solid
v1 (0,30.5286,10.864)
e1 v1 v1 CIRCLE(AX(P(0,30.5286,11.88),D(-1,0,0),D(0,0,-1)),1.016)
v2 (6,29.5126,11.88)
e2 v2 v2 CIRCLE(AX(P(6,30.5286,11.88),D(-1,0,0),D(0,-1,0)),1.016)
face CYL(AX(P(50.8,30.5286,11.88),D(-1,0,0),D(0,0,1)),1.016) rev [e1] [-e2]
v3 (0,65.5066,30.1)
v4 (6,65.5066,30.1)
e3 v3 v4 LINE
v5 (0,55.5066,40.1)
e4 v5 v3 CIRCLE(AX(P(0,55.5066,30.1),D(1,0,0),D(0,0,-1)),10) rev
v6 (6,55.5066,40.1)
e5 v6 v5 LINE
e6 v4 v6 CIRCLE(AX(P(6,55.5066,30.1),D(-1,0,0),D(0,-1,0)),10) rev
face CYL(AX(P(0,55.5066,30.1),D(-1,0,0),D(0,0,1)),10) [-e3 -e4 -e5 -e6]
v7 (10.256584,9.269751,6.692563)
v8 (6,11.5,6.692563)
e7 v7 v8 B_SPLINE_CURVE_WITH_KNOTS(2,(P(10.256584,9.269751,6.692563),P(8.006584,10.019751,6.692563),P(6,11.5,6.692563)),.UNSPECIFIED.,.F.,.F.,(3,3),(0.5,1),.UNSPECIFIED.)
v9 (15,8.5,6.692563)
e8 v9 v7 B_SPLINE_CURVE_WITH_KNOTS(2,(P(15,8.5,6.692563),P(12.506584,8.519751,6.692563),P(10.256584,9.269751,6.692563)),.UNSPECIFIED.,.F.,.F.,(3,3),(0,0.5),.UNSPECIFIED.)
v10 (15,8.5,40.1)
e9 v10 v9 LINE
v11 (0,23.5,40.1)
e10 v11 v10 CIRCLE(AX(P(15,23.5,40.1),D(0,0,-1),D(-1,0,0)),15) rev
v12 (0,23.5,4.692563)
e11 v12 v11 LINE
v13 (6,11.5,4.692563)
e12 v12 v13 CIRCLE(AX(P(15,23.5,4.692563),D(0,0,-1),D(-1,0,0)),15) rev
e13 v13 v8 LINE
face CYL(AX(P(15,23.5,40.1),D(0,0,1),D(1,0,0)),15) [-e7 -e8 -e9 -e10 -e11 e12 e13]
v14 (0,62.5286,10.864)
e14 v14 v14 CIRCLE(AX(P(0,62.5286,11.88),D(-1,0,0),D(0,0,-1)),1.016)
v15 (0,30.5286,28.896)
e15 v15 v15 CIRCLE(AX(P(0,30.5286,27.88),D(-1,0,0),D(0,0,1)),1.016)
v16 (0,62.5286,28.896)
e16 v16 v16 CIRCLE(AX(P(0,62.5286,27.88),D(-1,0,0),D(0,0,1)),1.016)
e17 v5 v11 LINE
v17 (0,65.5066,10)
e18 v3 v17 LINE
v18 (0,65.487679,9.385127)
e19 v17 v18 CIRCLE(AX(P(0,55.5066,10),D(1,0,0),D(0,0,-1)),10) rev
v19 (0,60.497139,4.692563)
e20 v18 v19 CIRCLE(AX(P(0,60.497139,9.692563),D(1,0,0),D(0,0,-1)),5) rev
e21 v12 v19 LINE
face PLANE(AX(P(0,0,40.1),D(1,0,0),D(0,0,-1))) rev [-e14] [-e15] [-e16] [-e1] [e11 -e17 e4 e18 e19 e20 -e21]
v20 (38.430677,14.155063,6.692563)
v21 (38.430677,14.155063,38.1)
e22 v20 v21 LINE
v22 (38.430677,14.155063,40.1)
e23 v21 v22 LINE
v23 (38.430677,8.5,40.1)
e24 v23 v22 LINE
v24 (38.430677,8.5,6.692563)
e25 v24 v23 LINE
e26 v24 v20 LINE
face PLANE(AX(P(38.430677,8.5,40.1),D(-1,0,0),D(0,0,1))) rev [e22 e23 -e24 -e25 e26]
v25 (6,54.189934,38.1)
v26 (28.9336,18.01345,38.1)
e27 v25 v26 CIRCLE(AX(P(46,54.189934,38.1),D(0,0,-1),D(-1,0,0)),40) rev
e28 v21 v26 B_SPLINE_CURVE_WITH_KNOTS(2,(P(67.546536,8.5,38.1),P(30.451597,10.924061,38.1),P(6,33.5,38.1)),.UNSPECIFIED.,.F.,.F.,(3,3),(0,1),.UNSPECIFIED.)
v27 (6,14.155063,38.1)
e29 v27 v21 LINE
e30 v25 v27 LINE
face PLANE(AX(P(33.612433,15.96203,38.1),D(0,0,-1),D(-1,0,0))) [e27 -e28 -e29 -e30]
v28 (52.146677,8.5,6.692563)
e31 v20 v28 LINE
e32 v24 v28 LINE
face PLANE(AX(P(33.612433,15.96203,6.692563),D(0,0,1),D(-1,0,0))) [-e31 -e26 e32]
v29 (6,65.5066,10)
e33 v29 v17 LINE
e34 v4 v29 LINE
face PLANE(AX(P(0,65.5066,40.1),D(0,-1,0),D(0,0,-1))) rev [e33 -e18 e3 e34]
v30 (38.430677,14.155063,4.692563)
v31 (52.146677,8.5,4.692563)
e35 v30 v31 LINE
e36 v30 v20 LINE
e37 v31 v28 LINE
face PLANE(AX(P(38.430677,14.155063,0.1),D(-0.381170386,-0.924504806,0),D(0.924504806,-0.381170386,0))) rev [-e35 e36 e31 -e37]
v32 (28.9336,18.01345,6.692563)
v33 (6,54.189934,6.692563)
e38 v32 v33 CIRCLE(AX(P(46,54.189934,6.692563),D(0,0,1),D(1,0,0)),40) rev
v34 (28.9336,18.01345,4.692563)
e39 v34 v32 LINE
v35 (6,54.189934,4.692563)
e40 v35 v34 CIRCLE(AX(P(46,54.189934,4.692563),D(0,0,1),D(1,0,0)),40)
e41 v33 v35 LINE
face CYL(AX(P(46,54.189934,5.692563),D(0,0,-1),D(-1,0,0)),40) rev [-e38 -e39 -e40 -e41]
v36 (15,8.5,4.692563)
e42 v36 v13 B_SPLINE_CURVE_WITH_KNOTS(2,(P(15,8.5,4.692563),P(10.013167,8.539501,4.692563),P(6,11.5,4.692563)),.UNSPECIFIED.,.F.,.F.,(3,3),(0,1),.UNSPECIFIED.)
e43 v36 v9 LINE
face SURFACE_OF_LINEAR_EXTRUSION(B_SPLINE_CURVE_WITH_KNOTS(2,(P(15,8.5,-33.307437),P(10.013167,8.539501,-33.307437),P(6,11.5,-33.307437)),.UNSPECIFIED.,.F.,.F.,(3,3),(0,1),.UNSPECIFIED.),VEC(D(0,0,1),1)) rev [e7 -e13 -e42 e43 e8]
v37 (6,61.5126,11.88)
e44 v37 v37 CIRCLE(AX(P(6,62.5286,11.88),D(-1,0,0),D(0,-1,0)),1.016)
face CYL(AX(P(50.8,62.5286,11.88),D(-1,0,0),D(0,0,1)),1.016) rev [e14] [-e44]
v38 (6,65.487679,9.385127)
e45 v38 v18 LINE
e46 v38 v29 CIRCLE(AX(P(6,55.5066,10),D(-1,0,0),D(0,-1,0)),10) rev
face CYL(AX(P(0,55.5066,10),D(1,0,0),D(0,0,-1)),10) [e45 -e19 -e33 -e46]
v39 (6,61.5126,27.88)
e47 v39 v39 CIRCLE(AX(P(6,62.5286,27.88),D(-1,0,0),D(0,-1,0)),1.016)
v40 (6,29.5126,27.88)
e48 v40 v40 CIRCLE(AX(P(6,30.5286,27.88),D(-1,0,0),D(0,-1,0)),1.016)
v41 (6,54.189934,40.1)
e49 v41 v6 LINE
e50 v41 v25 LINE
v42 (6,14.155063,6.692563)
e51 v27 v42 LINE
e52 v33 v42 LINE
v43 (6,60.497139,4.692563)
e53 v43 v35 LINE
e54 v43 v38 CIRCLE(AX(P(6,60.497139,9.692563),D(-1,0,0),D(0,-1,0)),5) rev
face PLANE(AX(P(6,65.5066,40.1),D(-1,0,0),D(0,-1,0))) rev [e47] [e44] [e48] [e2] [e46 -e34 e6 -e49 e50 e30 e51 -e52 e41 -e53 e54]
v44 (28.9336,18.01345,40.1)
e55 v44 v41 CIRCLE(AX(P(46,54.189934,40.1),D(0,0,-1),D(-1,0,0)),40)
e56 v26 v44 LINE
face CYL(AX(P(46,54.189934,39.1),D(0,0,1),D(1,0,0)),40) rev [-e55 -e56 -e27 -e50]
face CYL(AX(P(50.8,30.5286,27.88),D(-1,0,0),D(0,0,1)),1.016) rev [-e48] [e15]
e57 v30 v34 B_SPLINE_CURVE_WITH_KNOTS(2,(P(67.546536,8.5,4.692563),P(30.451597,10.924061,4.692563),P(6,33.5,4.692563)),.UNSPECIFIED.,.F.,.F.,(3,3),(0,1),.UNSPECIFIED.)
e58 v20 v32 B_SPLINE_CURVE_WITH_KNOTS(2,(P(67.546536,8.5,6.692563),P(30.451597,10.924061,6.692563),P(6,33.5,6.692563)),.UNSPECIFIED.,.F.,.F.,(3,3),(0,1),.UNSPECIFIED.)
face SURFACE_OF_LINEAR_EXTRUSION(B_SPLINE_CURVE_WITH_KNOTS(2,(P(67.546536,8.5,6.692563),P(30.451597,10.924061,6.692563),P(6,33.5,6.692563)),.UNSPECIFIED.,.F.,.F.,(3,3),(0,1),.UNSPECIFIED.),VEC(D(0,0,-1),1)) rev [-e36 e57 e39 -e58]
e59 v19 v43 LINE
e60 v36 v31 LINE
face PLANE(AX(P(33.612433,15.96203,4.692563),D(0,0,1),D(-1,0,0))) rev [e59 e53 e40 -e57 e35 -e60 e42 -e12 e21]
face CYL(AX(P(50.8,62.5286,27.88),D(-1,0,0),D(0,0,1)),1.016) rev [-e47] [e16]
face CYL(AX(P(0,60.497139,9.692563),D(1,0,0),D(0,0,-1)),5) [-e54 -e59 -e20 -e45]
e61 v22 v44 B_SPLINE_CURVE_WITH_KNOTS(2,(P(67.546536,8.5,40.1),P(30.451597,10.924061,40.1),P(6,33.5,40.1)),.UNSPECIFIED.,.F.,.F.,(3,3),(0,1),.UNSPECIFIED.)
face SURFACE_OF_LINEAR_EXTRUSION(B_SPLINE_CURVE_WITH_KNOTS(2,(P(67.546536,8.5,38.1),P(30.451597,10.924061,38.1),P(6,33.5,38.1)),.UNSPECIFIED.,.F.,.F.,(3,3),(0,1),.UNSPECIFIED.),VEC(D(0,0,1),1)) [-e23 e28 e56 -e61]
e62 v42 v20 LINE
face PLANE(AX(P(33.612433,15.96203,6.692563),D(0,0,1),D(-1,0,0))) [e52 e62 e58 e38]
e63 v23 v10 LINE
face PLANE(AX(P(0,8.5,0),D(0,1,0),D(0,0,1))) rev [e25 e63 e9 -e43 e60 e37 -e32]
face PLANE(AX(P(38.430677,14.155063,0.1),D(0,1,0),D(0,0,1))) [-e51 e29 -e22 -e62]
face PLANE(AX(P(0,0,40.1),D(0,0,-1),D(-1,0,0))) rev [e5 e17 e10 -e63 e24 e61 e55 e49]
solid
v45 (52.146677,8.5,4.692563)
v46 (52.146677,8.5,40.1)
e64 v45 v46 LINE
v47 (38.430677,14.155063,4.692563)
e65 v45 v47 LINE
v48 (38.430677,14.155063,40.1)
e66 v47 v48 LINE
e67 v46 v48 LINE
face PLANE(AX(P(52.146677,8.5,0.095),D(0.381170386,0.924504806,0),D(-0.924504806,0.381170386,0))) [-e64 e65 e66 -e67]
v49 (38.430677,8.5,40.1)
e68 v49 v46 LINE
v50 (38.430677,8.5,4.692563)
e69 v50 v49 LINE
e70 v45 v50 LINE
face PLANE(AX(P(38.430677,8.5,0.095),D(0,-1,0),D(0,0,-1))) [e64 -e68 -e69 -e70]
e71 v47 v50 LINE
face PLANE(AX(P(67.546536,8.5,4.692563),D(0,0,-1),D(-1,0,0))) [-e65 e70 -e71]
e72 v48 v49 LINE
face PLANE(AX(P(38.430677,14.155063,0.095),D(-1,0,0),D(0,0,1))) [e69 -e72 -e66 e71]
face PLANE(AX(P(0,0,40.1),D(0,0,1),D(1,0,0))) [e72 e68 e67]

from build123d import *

# Parameters (mm, degrees)
BOSS_EXTRUDE1_DEPTH     = 40.1
SKETCH3_R               = 1.35
CUT_EXTRUDE2_DEPTH      = 50.8
SKETCH4_R               = 1.016
CUT_EXTRUDE3_DEPTH      = 50.8
SKETCH6_W               = 62.086073973
SKETCH6_H               = 34.1
CUT_EXTRUDE4_DEPTH      = 6
BOSS_EXTRUDE5_DEPTH     = 2
SKETCH17_W              = 82.769776053
SKETCH17_H              = 17.379876248
CUT_EXTRUDE6_DEPTH      = 109.051490873
FILLET1_R               = 40
FILLET2_R               = 10
SKETCH18_W              = 43.778644302
SKETCH18_H              = 21.802108688
CUT_EXTRUDE7_DEPTH      = 103.282252926
SKETCH19_W              = 38.173171743
SKETCH19_H              = 5.655063101
BOSS_EXTRUDE6_DEPTH     = 40
FILLET3_R               = 15
BOSS_EXTRUDE7_DEPTH     = 40.005
CUT_EXTRUDE8_DEPTH      = 99.423070594
CUT_EXTRUDE8_DEPTH_BACK = 40
SKETCH22_W              = 21.621158957
SKETCH22_H              = 64.89245803
CUT_EXTRUDE9_DEPTH      = 40
FILLET6_R               = 5
CUT_EXTRUDE10_START     = -2
CUT_EXTRUDE10_DEPTH     = 2
FILLET7_R               = 40


# Read off the part's stored shape, not the designer's step: Cut-Extrude10
with BuildPart() as part:
    # Sketch1 → Boss-Extrude1 (new body)
    with BuildSketch(Plane.XY):
        Polygon((0, 0), (0, 65.5066), (6, 65.5066), (6, 8.5), (76, 8.5), (76, 0), align=None)
    extrude(amount=BOSS_EXTRUDE1_DEPTH)

    # Sketch3 → Cut-Extrude2 (cut)
    with BuildSketch(Plane.XY.offset(40.1)):
        with Locations((27.996, 2.8)):
            Circle(SKETCH3_R)
        with Locations((49.996, 2.8)):
            Circle(SKETCH3_R)
        with Locations((71.996, 2.8)):
            Circle(SKETCH3_R)
    extrude(amount=-CUT_EXTRUDE2_DEPTH, mode=Mode.SUBTRACT)

    # Sketch4 → Cut-Extrude3 (cut)
    with BuildSketch(Plane.ZY):
        with Locations((27.88, 30.5286)):
            Circle(SKETCH4_R)
        with Locations(Location((11.88, 30.5286, 0), (0, 0, 270))):
            Circle(SKETCH4_R)
        with Locations((27.88, 62.5286)):
            Circle(SKETCH4_R)
        with Locations(Location((11.88, 62.5286, 0), (0, 0, 270))):
            Circle(SKETCH4_R)
    extrude(amount=-CUT_EXTRUDE3_DEPTH, mode=Mode.SUBTRACT)

    # Sketch6 → Cut-Extrude4 (cut)
    with BuildSketch(Plane.XZ):
        with Locations((50.043036987, 20.05)):
            Rectangle(SKETCH6_W, SKETCH6_H)
    extrude(amount=-CUT_EXTRUDE4_DEPTH, mode=Mode.SUBTRACT)

    # Sketch16 → Boss-Extrude5 (add)
    with BuildSketch(Plane.XY.offset(40.1)):
        with BuildLine():
            Line((6, 8.5), (26, 8.5))
            Line((26, 8.5), (67.546536443, 8.5))
            add(Edge.make_bspline(
                [(6, 33.5), (30.451597349, 10.92406084), (67.546536443, 8.5)],
                knots=[0, 0, 0, 1, 1, 1], degree=2))
            Line((6, 33.5), (6, 8.5))
        make_face()
    boss_extrude5 = extrude(amount=-BOSS_EXTRUDE5_DEPTH)

    # Mirror2: Boss-Extrude5 across plane
    add(boss_extrude5.mirror(Plane(origin=(0, 0, 20.05), x_dir=(1, 0, 0), z_dir=(0, 0, -1))))

    # Sketch17 → Cut-Extrude6 (cut, through all)
    with BuildSketch(Plane.XY.offset(40.1)):
        with Locations((41.384888027, -0.189938124)):
            Rectangle(SKETCH17_W, SKETCH17_H)
    extrude(amount=-CUT_EXTRUDE6_DEPTH, mode=Mode.SUBTRACT)

    # Fillet1
    fillet1_edges = [part.edges().sort_by_distance(p)[0] for p in [
        (6, 33.5, 39.1),
        (6, 33.5, 1),
    ]]
    fillet(fillet1_edges, radius=FILLET1_R)

    # Fillet2
    fillet2_edges = [part.edges().sort_by_distance(p)[0] for p in [
        (3, 65.5066, 40.1),
        (3, 65.5066, 0),
    ]]
    fillet(fillet2_edges, radius=FILLET2_R)

    # Sketch18 → Cut-Extrude7 (cut, through all)
    with BuildSketch(Plane(origin=(0, 0, 0), x_dir=(-1, 0, 0), z_dir=(0, 0, -1))):
        with Locations((-60.319999127, 19.401054344)):
            Rectangle(SKETCH18_W, SKETCH18_H)
    extrude(amount=-CUT_EXTRUDE7_DEPTH, mode=Mode.SUBTRACT)

    # Sketch19 → Boss-Extrude6 (add)
    with BuildSketch(Plane.XY.offset(40.1)):
        with Locations((19.344091105, 11.327531551)):
            Rectangle(SKETCH19_W, SKETCH19_H)
    extrude(amount=-BOSS_EXTRUDE6_DEPTH)

    # Fillet3
    fillet3_edges = [part.edges().sort_by_distance(p)[0] for p in [
        (0, 8.5, 20.05),
    ]]
    fillet(fillet3_edges, radius=FILLET3_R)

    # Mirror3: Boss-Extrude5 across plane
    add(boss_extrude5.mirror(Plane(origin=(0, 0, 22.396281632), x_dir=(1, 0, 0), z_dir=(0, 0, -1))))


with BuildPart() as body_2:
    # Sketch20 → Boss-Extrude7 (new body)
    with BuildSketch(Plane.XY.offset(40.1)):
        Polygon((38.430676976, 8.5), (52.146676976, 8.5), (38.430676976, 14.155063101), align=None)
    extrude(amount=-BOSS_EXTRUDE7_DEPTH)


with BuildPart() as cut_extrude8_tool:
    # Sketch22 → Cut-Extrude8 (new, two sides: drawn at the far end of the back side and taken through both)
    with BuildSketch(Plane(origin=(6, 0, 0), x_dir=(0, 0, -1), z_dir=(1, 0, 0)).offset(-CUT_EXTRUDE8_DEPTH_BACK)):
        with Locations((6.118016215, 40.946229015)):
            Rectangle(SKETCH22_W, SKETCH22_H)
    extrude(amount=CUT_EXTRUDE8_DEPTH + CUT_EXTRUDE8_DEPTH_BACK)


with BuildPart() as part_1:
    add(part.part)

    # Cut-Extrude8: cut by cut_extrude8_tool
    add(cut_extrude8_tool.part, mode=Mode.SUBTRACT)

    # Sketch23 → Cut-Extrude9 (cut)
    with BuildSketch(Plane.XY.offset(40.1)):
        Polygon((38.430676976, 14.155063101), (52.146676976, 8.5), (77.553458586, 8.5), align=None)
    extrude(amount=-CUT_EXTRUDE9_DEPTH, mode=Mode.SUBTRACT)

    # Fillet6
    fillet6_edges = [part_1.edges().sort_by_distance(p)[0] for p in [
        (3, 63.981923905, 4.692563264),
    ]]
    fillet(fillet6_edges, radius=FILLET6_R)

    # Cut-Extrude10 outline → Cut-Extrude10 (cut)
    with BuildSketch(Plane.XY.offset(6.692563264).offset(CUT_EXTRUDE10_START)):
        with BuildLine():
            Line((6, 8.5), (15, 8.5))
            add(Edge.make_bspline(
                [(15, 8.5), (10.013167019, 8.539501058), (6, 11.5)],
                knots=[0, 0, 0, 1, 1, 1], degree=2))
            Line((6, 11.5), (6, 8.5))
        make_face()
    extrude(amount=CUT_EXTRUDE10_DEPTH, mode=Mode.SUBTRACT)

    # Fillet7
    fillet7_edges = [part_1.edges().sort_by_distance(p)[0] for p in [
        (6, 33.5, 5.692563264),
    ]]
    fillet(fillet7_edges, radius=FILLET7_R)


with BuildPart() as body_2_1:
    add(body_2.part)

    # Cut-Extrude8: cut by cut_extrude8_tool
    add(cut_extrude8_tool.part, mode=Mode.SUBTRACT)


solid = Compound([part_1.part, body_2_1.part])
